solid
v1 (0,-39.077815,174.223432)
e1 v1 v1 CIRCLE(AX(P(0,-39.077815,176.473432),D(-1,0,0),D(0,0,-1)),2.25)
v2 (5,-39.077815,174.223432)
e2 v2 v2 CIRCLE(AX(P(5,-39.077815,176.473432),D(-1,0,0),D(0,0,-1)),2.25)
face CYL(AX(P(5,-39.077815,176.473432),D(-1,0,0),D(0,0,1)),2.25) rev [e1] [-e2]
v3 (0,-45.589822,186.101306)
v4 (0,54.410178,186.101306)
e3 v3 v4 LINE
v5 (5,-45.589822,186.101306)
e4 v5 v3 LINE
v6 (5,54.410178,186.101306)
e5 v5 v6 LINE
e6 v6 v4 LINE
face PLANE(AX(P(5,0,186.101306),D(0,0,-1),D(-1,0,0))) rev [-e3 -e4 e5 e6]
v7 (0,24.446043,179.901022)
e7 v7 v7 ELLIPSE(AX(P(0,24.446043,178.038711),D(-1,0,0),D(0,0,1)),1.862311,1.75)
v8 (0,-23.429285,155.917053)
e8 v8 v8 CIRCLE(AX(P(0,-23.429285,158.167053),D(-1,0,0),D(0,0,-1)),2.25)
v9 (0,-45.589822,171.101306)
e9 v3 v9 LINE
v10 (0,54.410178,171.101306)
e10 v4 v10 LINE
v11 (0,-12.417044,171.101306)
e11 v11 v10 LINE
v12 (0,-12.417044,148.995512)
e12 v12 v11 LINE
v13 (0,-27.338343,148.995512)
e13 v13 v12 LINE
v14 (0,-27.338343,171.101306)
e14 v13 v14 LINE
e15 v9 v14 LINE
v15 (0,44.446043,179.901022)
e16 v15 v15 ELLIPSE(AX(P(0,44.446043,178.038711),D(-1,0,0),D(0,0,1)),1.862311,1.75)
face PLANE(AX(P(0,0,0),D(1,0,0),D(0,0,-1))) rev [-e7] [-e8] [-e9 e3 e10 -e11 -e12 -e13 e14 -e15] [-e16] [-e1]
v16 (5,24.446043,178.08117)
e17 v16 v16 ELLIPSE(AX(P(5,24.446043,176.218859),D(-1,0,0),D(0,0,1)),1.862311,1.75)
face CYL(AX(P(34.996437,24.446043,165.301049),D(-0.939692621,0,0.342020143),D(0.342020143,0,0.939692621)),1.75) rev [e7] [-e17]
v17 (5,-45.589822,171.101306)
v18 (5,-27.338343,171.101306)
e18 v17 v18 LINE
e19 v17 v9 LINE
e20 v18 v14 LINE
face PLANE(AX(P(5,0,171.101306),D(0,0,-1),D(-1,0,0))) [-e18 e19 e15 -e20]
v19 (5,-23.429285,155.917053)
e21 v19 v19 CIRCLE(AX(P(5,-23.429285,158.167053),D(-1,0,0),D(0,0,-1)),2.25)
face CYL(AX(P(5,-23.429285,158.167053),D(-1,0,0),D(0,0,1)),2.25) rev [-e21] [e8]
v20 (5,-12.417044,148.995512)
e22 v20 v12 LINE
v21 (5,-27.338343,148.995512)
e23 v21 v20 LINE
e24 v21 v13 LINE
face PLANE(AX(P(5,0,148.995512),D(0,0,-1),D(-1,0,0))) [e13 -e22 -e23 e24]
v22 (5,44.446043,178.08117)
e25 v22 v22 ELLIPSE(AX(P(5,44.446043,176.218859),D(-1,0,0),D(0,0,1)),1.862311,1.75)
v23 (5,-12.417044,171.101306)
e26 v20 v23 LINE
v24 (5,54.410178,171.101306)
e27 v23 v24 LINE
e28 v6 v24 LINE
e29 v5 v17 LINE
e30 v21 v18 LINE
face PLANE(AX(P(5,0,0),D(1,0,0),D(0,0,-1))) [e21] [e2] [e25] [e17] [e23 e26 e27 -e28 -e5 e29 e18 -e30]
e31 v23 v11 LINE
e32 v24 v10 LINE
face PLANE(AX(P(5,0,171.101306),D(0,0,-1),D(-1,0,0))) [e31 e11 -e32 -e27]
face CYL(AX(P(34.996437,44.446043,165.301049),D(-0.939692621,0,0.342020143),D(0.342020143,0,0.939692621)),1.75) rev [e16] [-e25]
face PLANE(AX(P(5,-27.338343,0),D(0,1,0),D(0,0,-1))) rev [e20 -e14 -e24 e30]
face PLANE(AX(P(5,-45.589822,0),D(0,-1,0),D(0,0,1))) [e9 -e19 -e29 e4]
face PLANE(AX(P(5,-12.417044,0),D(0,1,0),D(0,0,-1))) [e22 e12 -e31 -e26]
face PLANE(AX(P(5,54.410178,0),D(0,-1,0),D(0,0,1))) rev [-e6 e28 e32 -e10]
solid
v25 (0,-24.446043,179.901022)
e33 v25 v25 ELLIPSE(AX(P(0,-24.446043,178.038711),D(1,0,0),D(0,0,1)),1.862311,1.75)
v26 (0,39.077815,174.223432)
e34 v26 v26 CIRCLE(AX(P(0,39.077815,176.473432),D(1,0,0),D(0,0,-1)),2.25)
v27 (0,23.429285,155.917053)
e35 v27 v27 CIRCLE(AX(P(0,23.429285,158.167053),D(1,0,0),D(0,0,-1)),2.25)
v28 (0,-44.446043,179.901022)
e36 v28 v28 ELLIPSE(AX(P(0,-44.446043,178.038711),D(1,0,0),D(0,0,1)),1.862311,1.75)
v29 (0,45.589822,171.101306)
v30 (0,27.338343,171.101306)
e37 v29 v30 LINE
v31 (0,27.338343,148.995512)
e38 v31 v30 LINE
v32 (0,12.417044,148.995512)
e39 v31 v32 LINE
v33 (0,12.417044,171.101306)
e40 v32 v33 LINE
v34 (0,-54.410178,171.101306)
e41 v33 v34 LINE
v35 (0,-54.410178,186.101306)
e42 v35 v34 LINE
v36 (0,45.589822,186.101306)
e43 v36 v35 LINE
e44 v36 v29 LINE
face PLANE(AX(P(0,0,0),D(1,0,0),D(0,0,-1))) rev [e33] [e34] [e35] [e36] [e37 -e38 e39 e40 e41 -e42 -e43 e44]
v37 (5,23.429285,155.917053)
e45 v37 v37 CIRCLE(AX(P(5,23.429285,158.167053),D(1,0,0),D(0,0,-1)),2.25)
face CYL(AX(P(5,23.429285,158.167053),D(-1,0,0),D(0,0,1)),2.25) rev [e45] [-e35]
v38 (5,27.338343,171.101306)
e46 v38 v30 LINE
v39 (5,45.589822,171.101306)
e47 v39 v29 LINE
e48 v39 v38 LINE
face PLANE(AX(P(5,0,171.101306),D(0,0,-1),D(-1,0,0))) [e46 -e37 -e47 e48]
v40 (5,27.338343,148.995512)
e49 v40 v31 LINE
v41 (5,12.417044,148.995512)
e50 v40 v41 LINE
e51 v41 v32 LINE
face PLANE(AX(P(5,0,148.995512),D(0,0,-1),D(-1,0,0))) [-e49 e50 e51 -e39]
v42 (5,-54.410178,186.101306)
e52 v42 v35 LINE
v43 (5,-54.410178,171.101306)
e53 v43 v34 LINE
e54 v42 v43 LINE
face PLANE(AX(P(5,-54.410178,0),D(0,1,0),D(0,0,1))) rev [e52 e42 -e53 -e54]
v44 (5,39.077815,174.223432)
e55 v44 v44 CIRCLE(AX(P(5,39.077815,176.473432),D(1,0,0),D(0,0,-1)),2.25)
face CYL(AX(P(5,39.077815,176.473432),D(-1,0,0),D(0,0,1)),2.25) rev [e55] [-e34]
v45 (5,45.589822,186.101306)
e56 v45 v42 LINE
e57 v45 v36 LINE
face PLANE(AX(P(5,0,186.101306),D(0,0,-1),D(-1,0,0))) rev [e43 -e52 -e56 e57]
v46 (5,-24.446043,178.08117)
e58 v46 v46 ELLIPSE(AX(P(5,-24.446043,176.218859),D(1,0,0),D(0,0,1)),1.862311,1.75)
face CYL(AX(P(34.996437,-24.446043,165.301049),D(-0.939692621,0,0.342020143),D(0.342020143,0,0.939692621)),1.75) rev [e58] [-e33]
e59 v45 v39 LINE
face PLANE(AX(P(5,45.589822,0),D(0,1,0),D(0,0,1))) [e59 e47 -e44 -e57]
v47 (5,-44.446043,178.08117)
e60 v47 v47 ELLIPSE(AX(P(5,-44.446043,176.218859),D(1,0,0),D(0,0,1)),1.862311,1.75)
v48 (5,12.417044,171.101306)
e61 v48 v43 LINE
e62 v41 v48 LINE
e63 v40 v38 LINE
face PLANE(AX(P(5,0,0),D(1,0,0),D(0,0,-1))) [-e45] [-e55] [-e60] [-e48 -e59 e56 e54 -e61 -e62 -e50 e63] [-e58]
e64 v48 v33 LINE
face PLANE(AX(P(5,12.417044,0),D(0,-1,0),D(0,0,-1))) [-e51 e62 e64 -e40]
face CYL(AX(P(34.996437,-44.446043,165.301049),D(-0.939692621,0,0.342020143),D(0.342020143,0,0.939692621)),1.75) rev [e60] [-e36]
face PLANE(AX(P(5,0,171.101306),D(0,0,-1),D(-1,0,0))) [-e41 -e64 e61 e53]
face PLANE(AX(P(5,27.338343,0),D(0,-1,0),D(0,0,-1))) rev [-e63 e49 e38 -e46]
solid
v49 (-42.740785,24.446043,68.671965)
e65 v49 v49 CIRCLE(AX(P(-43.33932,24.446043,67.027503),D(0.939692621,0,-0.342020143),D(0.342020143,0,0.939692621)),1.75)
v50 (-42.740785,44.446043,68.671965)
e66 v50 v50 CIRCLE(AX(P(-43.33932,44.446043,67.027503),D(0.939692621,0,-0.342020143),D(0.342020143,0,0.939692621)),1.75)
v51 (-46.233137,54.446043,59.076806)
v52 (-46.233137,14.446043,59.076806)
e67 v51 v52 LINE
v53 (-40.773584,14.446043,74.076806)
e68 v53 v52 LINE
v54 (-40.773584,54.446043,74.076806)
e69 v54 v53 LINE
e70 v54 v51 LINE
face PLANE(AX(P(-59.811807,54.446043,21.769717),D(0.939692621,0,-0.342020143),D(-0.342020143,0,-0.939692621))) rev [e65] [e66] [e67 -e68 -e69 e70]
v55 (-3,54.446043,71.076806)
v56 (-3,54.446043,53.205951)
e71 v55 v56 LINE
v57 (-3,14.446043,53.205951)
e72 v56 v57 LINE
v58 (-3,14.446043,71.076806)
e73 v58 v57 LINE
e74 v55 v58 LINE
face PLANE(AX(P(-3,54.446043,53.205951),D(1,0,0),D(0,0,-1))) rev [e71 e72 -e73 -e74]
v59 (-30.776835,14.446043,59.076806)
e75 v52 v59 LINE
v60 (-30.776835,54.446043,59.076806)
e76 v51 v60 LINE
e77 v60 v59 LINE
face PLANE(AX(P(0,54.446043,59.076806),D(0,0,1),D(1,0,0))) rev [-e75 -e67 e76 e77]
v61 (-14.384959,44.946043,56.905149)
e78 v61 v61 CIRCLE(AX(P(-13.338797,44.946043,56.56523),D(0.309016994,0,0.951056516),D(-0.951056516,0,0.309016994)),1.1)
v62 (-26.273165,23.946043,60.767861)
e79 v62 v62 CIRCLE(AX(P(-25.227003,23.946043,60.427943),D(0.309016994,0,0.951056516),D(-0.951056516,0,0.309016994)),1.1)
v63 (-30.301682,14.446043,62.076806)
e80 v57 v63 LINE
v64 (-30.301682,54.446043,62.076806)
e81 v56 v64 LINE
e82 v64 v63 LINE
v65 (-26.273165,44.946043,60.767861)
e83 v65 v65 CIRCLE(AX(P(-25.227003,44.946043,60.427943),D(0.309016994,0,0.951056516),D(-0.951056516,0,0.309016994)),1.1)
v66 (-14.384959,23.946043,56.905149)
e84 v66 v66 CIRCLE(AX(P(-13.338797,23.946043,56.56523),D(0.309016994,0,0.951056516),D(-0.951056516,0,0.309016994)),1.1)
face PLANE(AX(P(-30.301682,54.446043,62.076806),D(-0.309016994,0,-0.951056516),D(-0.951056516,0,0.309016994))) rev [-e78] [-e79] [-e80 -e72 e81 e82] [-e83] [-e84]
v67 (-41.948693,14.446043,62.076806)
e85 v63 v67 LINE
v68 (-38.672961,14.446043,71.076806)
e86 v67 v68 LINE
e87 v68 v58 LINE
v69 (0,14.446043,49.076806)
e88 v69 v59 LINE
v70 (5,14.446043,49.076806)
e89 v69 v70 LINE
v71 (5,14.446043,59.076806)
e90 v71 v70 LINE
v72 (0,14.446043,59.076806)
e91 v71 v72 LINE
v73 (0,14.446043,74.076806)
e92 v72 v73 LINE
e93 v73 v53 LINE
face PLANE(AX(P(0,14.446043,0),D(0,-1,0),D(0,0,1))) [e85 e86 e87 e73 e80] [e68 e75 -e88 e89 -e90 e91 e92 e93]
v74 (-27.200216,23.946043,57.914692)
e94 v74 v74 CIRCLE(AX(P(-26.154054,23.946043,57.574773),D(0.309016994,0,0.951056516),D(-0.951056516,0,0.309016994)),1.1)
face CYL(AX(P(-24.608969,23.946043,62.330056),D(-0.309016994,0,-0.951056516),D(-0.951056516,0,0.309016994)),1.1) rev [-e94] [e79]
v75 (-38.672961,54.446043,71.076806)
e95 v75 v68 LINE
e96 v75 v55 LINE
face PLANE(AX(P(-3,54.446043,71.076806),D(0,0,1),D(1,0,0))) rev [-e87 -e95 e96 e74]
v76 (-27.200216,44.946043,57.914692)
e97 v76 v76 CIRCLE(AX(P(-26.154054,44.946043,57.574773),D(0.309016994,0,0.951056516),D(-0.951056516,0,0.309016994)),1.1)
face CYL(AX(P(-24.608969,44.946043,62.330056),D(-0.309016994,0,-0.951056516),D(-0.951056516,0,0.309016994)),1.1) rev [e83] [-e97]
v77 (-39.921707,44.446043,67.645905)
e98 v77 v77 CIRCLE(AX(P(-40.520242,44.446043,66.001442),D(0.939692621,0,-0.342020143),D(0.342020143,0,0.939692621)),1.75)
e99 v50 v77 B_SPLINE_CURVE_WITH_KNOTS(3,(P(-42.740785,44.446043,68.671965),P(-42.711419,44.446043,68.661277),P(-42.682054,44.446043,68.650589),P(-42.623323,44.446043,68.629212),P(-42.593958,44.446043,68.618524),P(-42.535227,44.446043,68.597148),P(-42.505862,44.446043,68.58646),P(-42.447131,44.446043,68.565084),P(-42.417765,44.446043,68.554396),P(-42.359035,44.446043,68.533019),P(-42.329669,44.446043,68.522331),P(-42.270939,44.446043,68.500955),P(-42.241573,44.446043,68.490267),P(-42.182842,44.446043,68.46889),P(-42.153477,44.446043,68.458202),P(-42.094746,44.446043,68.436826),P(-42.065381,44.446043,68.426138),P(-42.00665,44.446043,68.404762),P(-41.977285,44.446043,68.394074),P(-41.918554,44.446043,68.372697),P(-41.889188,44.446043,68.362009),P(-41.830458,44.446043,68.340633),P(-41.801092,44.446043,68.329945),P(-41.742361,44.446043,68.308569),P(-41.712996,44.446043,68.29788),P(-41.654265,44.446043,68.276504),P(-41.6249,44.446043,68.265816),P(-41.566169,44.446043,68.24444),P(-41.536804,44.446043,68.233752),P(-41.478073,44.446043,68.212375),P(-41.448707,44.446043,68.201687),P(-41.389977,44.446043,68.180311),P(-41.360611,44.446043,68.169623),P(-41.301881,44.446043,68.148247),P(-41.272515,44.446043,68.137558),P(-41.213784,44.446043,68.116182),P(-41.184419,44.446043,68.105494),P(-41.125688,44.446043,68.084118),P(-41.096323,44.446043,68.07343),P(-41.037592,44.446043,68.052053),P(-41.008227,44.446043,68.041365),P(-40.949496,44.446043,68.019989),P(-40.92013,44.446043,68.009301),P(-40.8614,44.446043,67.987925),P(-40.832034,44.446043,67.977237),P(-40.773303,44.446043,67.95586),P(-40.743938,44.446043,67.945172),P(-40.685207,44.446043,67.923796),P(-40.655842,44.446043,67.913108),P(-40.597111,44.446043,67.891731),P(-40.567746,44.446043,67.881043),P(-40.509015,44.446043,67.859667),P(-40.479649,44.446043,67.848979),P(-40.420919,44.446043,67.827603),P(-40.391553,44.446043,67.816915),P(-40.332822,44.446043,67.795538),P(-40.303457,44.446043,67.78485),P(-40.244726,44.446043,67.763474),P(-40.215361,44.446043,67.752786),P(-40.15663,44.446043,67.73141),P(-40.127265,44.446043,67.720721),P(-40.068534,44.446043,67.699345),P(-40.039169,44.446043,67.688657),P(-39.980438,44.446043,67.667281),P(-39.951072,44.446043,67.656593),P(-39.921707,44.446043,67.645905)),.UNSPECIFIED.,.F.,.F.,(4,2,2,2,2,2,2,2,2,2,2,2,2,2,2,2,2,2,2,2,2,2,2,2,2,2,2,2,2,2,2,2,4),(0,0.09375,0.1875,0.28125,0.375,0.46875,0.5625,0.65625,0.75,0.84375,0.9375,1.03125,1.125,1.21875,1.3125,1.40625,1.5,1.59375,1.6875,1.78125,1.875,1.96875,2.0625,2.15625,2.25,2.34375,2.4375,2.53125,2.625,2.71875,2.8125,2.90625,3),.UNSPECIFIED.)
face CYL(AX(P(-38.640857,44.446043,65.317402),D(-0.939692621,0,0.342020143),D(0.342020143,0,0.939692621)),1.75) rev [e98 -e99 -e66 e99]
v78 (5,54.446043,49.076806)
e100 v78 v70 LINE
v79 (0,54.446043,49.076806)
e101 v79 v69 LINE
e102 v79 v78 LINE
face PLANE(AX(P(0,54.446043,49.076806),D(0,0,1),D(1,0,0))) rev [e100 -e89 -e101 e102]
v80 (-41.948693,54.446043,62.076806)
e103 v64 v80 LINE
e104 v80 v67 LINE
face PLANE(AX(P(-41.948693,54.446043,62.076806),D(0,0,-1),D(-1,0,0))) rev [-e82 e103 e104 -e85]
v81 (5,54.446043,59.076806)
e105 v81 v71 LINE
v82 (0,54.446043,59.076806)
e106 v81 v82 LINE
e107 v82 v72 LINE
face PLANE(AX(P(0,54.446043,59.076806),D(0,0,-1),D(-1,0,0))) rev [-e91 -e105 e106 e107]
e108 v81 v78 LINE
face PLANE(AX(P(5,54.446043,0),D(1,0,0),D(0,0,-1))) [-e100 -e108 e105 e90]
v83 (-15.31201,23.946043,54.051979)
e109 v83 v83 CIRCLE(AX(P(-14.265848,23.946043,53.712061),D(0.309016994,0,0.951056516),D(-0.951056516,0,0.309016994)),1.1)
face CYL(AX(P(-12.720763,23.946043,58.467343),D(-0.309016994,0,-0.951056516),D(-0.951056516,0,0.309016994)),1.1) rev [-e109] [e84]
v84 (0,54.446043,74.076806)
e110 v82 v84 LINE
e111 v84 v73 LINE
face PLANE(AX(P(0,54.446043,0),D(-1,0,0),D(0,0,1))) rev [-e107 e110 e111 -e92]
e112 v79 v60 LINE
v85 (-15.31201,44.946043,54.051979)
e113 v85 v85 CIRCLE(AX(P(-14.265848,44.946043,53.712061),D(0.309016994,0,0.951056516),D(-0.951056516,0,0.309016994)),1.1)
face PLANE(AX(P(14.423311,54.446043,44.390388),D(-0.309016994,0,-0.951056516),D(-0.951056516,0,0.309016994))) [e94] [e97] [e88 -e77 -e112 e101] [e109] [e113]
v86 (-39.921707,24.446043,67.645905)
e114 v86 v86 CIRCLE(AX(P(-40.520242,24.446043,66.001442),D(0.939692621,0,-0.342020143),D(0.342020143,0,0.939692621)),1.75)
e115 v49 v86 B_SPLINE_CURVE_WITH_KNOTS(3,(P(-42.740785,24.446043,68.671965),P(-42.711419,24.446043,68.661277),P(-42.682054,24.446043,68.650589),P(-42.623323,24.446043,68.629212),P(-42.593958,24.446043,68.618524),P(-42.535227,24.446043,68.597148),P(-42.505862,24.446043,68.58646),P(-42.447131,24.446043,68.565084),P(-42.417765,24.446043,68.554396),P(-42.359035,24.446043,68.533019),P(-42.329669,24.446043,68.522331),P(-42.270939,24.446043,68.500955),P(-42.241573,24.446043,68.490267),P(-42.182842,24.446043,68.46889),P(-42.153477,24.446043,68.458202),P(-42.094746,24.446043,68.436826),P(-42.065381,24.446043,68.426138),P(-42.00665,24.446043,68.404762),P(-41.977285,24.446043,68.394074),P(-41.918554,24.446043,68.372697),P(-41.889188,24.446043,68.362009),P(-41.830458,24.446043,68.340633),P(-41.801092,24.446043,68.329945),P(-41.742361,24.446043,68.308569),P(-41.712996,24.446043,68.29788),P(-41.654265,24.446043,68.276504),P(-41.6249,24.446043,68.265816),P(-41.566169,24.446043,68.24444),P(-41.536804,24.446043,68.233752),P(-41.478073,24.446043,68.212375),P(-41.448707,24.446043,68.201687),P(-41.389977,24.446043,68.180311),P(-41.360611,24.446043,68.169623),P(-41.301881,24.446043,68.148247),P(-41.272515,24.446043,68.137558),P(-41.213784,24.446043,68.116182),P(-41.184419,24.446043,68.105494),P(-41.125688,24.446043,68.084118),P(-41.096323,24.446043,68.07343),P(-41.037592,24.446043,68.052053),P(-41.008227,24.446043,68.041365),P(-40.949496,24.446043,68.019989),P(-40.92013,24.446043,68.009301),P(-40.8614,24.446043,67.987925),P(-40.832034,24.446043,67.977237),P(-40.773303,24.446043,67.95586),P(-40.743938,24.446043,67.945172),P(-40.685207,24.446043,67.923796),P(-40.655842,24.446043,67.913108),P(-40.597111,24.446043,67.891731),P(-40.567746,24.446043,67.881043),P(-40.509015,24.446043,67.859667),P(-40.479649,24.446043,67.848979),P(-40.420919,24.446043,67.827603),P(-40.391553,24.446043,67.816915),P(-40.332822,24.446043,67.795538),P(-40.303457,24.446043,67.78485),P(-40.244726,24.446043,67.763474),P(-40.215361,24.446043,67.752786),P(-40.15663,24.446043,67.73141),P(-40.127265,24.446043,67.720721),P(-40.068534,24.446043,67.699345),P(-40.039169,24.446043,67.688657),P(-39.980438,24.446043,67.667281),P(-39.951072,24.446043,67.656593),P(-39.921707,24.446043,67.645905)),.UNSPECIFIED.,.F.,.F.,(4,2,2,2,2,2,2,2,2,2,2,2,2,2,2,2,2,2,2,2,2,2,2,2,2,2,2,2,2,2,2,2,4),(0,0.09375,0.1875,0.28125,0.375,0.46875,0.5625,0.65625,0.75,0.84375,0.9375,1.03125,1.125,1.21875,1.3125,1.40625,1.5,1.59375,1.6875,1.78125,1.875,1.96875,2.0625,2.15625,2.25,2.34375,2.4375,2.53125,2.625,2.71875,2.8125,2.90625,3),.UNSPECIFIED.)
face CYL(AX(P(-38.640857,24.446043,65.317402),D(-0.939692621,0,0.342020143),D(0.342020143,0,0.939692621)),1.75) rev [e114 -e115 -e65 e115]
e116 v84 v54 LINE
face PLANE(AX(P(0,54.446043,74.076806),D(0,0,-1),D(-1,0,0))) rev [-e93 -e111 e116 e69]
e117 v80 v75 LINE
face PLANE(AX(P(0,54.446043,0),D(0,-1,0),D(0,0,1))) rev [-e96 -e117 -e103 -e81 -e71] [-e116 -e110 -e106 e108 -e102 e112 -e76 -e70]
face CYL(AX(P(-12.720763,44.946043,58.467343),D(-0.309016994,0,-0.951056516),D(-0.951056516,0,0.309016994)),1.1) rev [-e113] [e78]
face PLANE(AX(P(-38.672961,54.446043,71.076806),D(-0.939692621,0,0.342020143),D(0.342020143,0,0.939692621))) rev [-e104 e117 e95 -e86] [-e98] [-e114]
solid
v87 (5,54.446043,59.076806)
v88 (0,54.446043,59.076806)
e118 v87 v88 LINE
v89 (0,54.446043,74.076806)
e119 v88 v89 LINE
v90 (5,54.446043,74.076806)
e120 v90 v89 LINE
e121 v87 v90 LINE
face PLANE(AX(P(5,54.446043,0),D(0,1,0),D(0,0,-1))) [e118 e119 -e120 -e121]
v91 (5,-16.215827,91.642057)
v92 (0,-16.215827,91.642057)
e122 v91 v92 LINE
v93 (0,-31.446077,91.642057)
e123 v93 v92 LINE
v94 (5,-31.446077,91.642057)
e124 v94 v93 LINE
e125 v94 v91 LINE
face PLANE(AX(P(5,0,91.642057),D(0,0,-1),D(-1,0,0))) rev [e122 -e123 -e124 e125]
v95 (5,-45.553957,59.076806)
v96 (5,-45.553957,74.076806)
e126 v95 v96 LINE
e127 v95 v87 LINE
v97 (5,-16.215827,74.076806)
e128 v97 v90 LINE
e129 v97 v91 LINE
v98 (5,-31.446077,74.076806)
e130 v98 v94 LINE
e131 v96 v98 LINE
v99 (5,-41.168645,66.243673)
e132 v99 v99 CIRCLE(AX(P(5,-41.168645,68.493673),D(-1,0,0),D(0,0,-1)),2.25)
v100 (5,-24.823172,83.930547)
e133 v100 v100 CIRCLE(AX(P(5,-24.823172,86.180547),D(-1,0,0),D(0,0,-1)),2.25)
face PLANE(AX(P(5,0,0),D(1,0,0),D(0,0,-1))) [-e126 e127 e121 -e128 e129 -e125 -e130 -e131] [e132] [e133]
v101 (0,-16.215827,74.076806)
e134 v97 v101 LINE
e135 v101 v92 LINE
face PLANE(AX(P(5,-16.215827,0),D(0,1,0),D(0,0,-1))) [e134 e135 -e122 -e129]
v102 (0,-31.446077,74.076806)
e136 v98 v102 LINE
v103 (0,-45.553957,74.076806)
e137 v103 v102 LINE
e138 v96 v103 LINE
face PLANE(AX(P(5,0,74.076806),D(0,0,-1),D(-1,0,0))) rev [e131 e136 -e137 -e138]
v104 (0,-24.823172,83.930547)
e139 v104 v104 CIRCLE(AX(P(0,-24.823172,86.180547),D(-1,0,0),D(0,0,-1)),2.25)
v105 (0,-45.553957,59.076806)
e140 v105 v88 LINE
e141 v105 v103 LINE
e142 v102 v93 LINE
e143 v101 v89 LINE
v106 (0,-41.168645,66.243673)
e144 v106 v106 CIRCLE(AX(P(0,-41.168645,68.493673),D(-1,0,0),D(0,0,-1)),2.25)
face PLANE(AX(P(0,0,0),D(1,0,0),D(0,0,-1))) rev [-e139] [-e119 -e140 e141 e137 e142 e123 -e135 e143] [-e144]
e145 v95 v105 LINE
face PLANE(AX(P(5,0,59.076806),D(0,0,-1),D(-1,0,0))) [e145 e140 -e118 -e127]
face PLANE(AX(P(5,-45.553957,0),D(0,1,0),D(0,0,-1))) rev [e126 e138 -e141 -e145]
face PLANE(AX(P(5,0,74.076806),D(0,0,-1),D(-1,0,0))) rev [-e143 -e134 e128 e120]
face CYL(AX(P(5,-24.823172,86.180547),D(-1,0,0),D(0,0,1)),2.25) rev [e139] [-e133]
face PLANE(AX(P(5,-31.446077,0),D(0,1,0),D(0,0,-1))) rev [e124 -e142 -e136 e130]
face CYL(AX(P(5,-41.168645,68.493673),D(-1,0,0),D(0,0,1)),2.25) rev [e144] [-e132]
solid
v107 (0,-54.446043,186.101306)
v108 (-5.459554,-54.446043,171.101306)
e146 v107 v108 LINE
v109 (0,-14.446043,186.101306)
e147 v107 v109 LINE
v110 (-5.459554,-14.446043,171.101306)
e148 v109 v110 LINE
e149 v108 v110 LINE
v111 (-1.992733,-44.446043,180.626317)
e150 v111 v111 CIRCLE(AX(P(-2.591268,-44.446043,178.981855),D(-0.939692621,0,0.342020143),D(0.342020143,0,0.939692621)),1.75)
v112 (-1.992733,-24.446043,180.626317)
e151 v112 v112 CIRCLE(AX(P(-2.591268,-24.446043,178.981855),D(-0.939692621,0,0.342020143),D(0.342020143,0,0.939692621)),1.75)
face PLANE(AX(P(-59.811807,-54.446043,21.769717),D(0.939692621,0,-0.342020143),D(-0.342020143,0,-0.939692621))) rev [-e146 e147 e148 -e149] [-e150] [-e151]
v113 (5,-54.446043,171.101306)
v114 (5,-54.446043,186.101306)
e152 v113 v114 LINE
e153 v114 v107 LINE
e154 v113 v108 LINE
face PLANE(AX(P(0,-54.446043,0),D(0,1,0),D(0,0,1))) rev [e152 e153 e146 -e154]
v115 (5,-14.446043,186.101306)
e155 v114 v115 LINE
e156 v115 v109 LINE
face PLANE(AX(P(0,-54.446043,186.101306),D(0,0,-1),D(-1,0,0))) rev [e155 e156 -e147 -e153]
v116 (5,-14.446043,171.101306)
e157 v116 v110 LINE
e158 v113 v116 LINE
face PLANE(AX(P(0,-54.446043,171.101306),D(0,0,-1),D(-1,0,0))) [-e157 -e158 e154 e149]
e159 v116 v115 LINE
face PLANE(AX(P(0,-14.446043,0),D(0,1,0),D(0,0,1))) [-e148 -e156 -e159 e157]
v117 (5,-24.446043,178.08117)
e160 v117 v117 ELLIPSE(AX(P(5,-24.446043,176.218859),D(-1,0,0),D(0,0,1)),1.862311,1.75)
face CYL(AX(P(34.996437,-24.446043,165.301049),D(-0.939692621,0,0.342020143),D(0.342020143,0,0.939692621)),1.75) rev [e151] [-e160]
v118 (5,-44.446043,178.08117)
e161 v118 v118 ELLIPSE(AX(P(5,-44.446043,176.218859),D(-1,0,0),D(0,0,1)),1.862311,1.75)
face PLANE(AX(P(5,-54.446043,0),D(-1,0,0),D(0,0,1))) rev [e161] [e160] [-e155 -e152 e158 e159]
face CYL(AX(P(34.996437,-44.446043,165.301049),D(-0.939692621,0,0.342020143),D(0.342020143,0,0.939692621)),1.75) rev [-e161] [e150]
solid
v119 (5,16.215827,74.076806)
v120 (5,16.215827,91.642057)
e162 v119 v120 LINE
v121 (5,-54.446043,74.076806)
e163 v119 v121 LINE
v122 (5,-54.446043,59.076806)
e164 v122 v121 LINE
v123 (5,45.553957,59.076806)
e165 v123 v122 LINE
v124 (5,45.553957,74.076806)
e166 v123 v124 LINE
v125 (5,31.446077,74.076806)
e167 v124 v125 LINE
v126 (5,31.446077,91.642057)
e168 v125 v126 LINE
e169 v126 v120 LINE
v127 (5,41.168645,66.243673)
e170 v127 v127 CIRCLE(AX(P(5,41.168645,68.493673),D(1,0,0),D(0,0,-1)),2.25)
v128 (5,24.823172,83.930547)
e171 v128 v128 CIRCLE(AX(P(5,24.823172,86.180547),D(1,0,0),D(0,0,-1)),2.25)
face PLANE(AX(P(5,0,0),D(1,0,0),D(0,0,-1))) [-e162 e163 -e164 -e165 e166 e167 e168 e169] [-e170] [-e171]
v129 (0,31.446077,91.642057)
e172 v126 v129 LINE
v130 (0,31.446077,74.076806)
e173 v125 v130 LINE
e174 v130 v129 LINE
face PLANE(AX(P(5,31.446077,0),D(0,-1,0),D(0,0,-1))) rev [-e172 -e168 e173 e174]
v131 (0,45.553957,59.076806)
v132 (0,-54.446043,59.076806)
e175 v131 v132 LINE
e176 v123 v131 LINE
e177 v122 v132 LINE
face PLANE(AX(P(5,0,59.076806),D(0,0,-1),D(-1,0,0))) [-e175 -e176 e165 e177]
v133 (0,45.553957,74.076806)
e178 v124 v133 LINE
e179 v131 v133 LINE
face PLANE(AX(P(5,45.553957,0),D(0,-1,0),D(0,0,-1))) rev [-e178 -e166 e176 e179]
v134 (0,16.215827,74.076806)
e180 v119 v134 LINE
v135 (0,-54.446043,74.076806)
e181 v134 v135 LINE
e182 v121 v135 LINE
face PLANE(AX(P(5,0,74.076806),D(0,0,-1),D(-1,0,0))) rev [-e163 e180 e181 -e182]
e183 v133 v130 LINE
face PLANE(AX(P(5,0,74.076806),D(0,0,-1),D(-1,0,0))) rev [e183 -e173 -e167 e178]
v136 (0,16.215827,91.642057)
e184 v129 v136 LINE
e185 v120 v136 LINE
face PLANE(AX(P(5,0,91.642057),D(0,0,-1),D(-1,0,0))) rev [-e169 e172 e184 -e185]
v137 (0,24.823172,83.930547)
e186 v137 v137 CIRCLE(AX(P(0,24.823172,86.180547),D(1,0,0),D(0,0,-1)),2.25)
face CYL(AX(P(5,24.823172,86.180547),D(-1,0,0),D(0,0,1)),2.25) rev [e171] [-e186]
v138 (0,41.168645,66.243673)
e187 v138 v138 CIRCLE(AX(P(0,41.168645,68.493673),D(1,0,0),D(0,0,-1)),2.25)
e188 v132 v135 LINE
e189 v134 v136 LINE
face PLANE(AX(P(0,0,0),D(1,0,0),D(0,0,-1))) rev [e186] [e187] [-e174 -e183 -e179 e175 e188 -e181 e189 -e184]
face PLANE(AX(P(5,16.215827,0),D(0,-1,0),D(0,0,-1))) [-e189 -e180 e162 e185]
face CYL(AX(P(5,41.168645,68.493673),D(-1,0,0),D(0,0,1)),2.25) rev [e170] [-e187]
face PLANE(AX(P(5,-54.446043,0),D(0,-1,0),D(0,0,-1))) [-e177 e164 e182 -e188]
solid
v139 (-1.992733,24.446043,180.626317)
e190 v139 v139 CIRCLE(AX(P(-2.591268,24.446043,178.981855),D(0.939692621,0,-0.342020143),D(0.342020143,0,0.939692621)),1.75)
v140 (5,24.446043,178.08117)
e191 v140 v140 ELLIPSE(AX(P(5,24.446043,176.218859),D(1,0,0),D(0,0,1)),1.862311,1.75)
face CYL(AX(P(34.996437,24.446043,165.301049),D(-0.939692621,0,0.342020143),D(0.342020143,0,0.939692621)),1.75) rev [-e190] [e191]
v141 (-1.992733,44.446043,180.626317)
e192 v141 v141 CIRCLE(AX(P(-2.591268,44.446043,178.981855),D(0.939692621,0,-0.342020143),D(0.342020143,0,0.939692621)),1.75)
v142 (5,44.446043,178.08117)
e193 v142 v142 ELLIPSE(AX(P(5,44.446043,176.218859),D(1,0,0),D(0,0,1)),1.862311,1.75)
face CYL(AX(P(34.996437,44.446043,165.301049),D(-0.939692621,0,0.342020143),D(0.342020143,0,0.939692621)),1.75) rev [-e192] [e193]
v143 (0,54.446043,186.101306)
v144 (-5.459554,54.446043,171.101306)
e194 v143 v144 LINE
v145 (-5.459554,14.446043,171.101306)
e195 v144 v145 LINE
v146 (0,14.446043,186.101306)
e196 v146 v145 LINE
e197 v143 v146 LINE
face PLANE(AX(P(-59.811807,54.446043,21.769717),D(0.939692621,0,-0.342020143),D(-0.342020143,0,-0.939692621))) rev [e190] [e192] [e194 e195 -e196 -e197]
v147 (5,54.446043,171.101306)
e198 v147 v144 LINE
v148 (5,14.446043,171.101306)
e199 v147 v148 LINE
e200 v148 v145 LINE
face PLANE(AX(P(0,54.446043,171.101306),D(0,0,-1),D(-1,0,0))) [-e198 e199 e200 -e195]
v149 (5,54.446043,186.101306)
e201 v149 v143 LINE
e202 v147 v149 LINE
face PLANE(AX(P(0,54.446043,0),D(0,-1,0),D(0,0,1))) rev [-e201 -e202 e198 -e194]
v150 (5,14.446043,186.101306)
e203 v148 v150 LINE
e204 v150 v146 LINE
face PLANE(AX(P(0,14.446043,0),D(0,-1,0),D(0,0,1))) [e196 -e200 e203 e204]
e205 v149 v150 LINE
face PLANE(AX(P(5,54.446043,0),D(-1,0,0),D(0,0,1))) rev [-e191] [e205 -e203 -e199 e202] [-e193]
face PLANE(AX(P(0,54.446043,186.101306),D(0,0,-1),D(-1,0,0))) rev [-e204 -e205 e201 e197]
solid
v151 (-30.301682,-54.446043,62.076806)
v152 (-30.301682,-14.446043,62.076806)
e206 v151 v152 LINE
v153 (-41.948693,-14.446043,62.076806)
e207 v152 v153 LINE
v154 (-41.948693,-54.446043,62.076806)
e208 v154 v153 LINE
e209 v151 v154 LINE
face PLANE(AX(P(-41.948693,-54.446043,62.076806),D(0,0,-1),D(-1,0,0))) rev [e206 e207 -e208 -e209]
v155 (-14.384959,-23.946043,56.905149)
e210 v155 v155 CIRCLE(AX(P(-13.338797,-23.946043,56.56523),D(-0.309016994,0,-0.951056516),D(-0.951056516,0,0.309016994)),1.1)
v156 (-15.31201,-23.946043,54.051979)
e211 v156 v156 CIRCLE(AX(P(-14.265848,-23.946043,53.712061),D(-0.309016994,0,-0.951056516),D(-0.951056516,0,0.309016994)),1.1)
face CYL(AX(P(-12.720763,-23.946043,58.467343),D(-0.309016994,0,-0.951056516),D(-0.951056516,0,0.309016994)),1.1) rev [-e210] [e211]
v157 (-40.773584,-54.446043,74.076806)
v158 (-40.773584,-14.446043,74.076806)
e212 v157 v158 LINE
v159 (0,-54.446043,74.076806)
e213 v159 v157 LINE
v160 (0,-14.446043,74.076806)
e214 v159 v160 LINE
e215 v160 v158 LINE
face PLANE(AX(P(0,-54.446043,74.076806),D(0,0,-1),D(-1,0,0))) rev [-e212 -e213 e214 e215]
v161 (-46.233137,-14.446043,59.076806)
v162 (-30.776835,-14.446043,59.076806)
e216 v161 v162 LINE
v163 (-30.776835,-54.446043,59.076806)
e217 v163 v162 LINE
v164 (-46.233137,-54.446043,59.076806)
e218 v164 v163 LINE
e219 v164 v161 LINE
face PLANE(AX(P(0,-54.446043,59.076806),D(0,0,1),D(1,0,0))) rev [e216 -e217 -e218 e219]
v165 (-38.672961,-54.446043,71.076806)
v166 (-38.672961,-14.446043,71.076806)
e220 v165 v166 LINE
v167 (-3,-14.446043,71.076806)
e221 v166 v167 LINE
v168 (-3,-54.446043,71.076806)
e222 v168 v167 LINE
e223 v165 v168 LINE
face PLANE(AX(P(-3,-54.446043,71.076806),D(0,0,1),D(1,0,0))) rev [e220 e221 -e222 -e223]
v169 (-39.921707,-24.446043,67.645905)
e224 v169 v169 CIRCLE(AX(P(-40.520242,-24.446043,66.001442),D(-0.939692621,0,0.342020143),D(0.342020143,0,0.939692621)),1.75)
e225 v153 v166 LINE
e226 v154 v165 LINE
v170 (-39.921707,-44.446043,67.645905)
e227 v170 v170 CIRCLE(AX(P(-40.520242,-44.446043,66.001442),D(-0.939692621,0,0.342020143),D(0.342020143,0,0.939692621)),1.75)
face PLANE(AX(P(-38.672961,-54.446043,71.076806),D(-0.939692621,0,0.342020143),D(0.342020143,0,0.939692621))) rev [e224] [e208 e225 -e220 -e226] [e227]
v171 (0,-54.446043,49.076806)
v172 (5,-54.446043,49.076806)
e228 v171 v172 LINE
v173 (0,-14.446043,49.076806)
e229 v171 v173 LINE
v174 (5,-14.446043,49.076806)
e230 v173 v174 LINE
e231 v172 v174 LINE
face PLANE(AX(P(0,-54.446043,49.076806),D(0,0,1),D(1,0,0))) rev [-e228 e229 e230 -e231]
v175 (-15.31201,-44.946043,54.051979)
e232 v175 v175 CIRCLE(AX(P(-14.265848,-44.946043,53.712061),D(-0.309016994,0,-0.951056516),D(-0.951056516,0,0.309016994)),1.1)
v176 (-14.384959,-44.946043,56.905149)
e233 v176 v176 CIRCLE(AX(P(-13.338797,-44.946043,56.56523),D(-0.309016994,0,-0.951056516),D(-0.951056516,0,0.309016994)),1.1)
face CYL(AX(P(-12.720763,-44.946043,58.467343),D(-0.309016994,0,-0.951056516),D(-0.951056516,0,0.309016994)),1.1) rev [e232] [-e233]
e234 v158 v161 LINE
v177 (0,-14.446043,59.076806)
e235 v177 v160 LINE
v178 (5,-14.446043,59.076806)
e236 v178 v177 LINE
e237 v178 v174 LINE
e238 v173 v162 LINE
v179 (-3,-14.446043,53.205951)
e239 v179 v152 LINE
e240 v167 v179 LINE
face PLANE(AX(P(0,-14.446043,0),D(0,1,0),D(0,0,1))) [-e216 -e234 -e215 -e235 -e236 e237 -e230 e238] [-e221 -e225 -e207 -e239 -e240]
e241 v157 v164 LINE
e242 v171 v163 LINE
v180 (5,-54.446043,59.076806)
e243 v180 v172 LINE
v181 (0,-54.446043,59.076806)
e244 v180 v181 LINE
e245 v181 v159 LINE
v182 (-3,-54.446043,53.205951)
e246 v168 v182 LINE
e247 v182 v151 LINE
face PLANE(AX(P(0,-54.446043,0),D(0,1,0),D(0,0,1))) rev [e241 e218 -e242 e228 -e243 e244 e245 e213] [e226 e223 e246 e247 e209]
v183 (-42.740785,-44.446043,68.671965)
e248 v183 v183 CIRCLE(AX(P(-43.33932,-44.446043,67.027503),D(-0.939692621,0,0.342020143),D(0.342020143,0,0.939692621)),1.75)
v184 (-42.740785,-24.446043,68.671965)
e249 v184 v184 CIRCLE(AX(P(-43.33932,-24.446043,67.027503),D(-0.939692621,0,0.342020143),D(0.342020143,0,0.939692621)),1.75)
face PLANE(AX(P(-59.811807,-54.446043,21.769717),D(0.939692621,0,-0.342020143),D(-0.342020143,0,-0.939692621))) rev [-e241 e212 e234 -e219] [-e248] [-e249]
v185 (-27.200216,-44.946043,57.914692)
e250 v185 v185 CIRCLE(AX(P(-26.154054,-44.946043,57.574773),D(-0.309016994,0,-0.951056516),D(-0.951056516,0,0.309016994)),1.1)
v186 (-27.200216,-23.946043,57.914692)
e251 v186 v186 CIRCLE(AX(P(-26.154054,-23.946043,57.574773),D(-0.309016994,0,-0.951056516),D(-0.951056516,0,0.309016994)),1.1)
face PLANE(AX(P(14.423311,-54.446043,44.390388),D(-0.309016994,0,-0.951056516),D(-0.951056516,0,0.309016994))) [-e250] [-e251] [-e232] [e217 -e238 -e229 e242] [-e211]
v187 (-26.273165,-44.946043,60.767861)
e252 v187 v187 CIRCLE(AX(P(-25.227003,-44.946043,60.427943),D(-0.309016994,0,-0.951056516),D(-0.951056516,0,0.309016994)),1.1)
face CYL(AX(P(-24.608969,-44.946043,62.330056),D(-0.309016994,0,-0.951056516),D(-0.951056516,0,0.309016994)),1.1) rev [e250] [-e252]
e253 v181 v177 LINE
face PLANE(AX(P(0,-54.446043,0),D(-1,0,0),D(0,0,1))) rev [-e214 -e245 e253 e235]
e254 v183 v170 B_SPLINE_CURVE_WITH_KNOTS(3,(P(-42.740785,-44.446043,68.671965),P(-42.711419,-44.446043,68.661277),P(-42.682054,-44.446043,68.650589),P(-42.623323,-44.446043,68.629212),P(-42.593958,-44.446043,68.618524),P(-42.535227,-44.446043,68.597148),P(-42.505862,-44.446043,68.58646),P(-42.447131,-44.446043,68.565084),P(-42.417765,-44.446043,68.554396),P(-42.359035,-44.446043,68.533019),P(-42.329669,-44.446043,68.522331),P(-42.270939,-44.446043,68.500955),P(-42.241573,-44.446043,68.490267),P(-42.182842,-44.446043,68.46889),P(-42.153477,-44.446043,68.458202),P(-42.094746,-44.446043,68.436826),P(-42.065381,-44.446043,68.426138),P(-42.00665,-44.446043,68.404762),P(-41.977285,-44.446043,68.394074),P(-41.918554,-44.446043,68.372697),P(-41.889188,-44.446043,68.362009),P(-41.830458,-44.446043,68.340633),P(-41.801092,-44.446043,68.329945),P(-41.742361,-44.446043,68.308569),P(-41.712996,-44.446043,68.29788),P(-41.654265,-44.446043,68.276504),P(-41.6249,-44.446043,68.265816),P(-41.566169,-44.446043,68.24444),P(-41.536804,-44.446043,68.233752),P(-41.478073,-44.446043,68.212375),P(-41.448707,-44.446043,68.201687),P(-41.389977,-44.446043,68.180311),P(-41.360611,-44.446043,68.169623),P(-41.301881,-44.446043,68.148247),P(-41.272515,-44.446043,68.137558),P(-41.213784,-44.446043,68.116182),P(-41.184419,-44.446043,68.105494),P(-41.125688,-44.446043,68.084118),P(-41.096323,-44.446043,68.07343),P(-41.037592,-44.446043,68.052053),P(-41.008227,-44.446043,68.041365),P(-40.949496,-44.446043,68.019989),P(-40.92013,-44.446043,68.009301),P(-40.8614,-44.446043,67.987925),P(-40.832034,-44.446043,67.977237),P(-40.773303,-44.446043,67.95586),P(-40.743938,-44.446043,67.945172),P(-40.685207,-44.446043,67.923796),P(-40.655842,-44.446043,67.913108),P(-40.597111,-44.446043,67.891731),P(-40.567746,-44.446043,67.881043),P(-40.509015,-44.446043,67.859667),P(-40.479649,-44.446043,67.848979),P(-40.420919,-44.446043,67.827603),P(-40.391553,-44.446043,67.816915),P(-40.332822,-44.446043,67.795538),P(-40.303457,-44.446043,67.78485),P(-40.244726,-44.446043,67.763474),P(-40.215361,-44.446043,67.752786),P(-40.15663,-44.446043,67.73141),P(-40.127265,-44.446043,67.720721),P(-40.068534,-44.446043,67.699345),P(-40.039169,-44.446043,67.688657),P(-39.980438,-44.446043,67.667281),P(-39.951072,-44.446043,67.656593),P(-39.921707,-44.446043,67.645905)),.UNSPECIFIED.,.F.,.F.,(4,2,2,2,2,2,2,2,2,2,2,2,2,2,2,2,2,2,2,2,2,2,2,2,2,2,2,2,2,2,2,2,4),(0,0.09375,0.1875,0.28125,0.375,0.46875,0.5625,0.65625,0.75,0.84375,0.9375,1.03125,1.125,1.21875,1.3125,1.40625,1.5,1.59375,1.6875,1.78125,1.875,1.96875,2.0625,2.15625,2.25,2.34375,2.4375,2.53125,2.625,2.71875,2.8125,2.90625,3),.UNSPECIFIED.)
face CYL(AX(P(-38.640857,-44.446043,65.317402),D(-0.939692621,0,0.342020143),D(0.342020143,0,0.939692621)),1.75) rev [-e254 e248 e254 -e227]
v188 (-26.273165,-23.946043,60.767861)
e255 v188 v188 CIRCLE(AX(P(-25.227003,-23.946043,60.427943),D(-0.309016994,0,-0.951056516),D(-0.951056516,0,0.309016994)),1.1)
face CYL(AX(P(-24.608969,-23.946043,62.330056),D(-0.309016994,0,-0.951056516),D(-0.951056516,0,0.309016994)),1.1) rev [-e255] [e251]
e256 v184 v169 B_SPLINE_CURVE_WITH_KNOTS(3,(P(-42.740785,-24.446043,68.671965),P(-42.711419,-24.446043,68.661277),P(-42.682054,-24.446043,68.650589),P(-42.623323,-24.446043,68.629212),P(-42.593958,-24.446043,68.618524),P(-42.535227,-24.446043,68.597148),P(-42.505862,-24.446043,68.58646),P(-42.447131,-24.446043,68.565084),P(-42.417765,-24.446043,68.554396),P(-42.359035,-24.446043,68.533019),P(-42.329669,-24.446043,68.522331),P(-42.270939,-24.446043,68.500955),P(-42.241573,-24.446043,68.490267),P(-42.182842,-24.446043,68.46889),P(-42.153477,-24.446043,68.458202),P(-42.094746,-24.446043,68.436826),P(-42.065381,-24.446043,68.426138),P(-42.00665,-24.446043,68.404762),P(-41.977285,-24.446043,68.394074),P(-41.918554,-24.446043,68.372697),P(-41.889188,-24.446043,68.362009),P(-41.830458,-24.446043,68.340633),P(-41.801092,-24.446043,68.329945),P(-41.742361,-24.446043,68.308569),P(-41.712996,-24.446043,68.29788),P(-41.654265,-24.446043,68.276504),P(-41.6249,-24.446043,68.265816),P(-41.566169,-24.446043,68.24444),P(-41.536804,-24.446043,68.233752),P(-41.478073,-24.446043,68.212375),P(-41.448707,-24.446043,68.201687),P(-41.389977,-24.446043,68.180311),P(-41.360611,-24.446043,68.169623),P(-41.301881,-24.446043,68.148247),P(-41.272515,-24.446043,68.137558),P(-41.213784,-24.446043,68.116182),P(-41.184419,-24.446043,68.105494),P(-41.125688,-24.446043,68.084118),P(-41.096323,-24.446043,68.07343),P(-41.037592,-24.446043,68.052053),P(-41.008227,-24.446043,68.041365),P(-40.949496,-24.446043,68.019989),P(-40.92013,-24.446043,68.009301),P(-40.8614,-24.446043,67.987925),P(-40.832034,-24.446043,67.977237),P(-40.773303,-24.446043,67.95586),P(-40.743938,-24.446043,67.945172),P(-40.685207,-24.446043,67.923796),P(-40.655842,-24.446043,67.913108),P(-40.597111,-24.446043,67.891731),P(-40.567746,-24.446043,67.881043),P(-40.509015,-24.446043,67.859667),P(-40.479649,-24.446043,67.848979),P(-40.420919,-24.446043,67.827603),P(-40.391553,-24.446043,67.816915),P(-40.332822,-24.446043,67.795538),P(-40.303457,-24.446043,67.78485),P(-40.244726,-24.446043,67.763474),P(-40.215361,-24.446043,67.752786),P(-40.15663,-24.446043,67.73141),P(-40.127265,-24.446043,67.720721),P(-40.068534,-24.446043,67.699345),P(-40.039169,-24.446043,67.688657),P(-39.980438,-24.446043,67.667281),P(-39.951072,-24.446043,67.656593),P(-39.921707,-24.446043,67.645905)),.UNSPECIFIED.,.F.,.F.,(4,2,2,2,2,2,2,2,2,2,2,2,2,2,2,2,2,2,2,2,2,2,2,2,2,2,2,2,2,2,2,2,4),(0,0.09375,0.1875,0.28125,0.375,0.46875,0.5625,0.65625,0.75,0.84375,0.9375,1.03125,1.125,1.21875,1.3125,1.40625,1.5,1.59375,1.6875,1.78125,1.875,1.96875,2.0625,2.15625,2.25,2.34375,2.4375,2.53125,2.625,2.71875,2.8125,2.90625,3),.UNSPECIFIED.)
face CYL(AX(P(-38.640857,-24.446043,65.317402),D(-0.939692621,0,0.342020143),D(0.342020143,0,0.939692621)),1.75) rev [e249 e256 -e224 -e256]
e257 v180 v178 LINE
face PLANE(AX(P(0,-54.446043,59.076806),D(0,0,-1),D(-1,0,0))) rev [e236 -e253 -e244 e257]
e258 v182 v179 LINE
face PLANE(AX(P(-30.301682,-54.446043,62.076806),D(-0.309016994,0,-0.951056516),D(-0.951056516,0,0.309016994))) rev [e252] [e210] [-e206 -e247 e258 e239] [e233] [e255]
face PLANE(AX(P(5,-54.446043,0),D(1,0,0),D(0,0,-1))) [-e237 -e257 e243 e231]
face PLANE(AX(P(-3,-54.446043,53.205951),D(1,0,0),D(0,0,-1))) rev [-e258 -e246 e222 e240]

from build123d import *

# Parameters (mm, degrees)
SKETCH1_W           = 100
SKETCH1_H           = 15
SKETCH1_R           = 2.25
SKETCH1_W_2         = 14.921299074
SKETCH1_H_2         = 22.105793739
SKETCH1_W_3         = 70.661870142
SKETCH1_W_4         = 15.23025044
SKETCH1_H_3         = 17.565251106
SKETCH1_W_5         = 14.107879418
BOSS_EXTRUDE1_DEPTH = 5
BOSS_EXTRUDE2_START = -40
BOSS_EXTRUDE2_DEPTH = 40
SKETCH3_W           = 5
SKETCH3_H           = 10
BOSS_EXTRUDE3_DEPTH = 40
CUT_EXTRUDE1_DEPTH  = 40
SKETCH5_R           = 1.75
CUT_EXTRUDE2_DEPTH  = 40
SKETCH6_R           = 1.75
CUT_EXTRUDE3_DEPTH  = 5
SKETCH8_R           = 1.1
CUT_EXTRUDE4_DEPTH  = 5


# Read off the part's stored shape, not the designer's step: Boss-Extrude2
with BuildPart() as part:
    # Sketch1 → Boss-Extrude1 (new body)
    # profile 1 of 6: a face of its own
    with BuildSketch(Plane(origin=(0, 0, 0), x_dir=(0, -1, 0), z_dir=(1, 0, 0))):
        with Locations((4.410178483, -178.601306164)):
            Rectangle(SKETCH1_W, SKETCH1_H)
        with Locations(Location((-39.077814949, -176.473432316, 0), (0, 0, 90))):
            Circle(SKETCH1_R, mode=Mode.SUBTRACT)
    # profile 2 of 6: a face of its own
    with BuildSketch(Plane(origin=(0, 0, 0), x_dir=(0, -1, 0), z_dir=(1, 0, 0))):
        with Locations((-19.877693347, -160.048409295)):
            Rectangle(SKETCH1_W_2, SKETCH1_H_2)
        with Locations(Location((-23.429285294, -158.167053109, 0), (0, 0, 90))):
            Circle(SKETCH1_R, mode=Mode.SUBTRACT)
    # profile 3 of 6: a face of its own
    with BuildSketch(Plane(origin=(0, 0, 0), x_dir=(0, -1, 0), z_dir=(1, 0, 0))):
        with Locations((19.115108312, -66.576805734)):
            Rectangle(SKETCH1_W_3, SKETCH1_H)
    # profile 4 of 6: a face of its own
    with BuildSketch(Plane(origin=(0, 0, 0), x_dir=(0, -1, 0), z_dir=(1, 0, 0))):
        with Locations((-23.830951979, -82.859431287)):
            Rectangle(SKETCH1_W_4, SKETCH1_H_3)
        with Locations(Location((-24.823172215, -86.180546879, 0), (0, 0, 90))):
            Circle(SKETCH1_R, mode=Mode.SUBTRACT)
    # profile 5 of 6: a face of its own
    with BuildSketch(Plane(origin=(0, 0, 0), x_dir=(0, -1, 0), z_dir=(1, 0, 0))):
        with Locations((-23.830951979, -66.576805734)):
            Rectangle(SKETCH1_W_4, SKETCH1_H)
    # profile 6 of 6: a face of its own
    with BuildSketch(Plane(origin=(0, 0, 0), x_dir=(0, -1, 0), z_dir=(1, 0, 0))):
        with Locations((-38.500016908, -66.576805734)):
            Rectangle(SKETCH1_W_5, SKETCH1_H)
        with Locations(Location((-41.168645329, -68.49367297, 0), (0, 0, 90))):
            Circle(SKETCH1_R, mode=Mode.SUBTRACT)
    extrude(amount=BOSS_EXTRUDE1_DEPTH)


with BuildPart() as body_2:
    # Boss-Extrude2 outline → Boss-Extrude2 (new body)
    with BuildSketch(Plane(origin=(0, 45.553956617, 0), x_dir=(-1, 0, 0), z_dir=(0, 1, 0)).offset(BOSS_EXTRUDE2_START)):
        Polygon((0, 59.076805734), (46.233137179, 59.076805734), (40.773583665, 74.076805734), (0, 74.076805734), align=None)
        Polygon((-5, 186.101306164), (-5, 171.101306164), (5.459553514, 171.101306164), (0, 186.101306164), align=None)
    extrude(amount=BOSS_EXTRUDE2_DEPTH)

    # Sketch3 → Boss-Extrude3 (add)
    with BuildSketch(Plane(origin=(0, 45.553956617, 0), x_dir=(-1, 0, 0), z_dir=(0, 1, 0))):
        Polygon((30.776835372, 59.076805734), (0, 59.076805734), (0, 49.076805734), align=None)
        with Locations((-2.5, 54.076805734)):
            Rectangle(SKETCH3_W, SKETCH3_H)
    extrude(amount=-BOSS_EXTRUDE3_DEPTH)

    # Sketch4 → Cut-Extrude1 (cut)
    with BuildSketch(Plane(origin=(0, 45.553956617, 0), x_dir=(-1, 0, 0), z_dir=(0, 1, 0))):
        Polygon((30.301682051, 62.076805734), (3, 53.205951496), (3, 71.076805734), (38.67296105, 71.076805734), (41.948693159, 62.076805734), align=None)
    extrude(amount=-CUT_EXTRUDE1_DEPTH, mode=Mode.SUBTRACT)


with BuildPart() as body_2_1:
    # Body-Move/Copy1: moved
    add(body_2.part.moved(Location((0, -60, 0))))


with BuildPart() as cut_extrude2_tool:
    # Sketch5 → Cut-Extrude2 (new body)
    with BuildSketch(Plane(origin=(-59.811806874, 0, 21.76971736), x_dir=(0, -1, 0), z_dir=(-0.9396926207859104, 0, 0.34202014332566316))):
        with Locations(Location((24.446043383, 167.301662499, 0), (0, 0, 90))):
            Circle(SKETCH5_R)
        with Locations(Location((44.446043383, 167.301662499, 0), (0, 0, 90))):
            Circle(SKETCH5_R)
    extrude(amount=-CUT_EXTRUDE2_DEPTH)


with BuildPart() as part_1:
    add(part.part)

    # Cut-Extrude2: cut by cut_extrude2_tool
    add(cut_extrude2_tool.part, mode=Mode.SUBTRACT)


with BuildPart() as body_2_2:
    add(body_2_1.part)

    # Cut-Extrude2: cut by cut_extrude2_tool
    add(cut_extrude2_tool.part, mode=Mode.SUBTRACT)

    # Sketch6 → Cut-Extrude3 (cut)
    with BuildSketch(Plane(origin=(-59.811806874, 0, 21.76971736), x_dir=(0, -1, 0), z_dir=(-0.9396926207859104, 0, 0.34202014332566316))):
        with Locations(Location((24.446043383, 48.162329344, 0), (0, 0, 90))):
            Circle(SKETCH6_R)
        with Locations(Location((44.446043383, 48.162329344, 0), (0, 0, 90))):
            Circle(SKETCH6_R)
    extrude(amount=-CUT_EXTRUDE3_DEPTH, mode=Mode.SUBTRACT)

    # Sketch8 → Cut-Extrude4 (cut)
    with BuildSketch(Plane(origin=(14.42331132, 0, 44.390387801), x_dir=(0.9510565162951521, 0, -0.309016994374952), z_dir=(-0.309016994374952, 0, -0.9510565162951521))):
        with Locations(Location((-42.665567001, 23.946043383, 0), (0, 0, 180))):
            Circle(SKETCH8_R)
        with Locations(Location((-30.165567001, 23.946043383, 0), (0, 0, 180))):
            Circle(SKETCH8_R)
        with Locations(Location((-42.665567001, 44.946043383, 0), (0, 0, 180))):
            Circle(SKETCH8_R)
        with Locations(Location((-30.165567001, 44.946043383, 0), (0, 0, 180))):
            Circle(SKETCH8_R)
    extrude(amount=-CUT_EXTRUDE4_DEPTH, mode=Mode.SUBTRACT)


with BuildPart() as body_3:
    # Mirror1: mirrored copy
    add(part_1.part.mirror(Plane.ZX))


with BuildPart() as body_4:
    # Mirror1 2: mirrored copy
    add(body_2_2.part.mirror(Plane.ZX))


solid = Compound([part_1.part, body_2_2.part, body_3.part, body_4.part])
